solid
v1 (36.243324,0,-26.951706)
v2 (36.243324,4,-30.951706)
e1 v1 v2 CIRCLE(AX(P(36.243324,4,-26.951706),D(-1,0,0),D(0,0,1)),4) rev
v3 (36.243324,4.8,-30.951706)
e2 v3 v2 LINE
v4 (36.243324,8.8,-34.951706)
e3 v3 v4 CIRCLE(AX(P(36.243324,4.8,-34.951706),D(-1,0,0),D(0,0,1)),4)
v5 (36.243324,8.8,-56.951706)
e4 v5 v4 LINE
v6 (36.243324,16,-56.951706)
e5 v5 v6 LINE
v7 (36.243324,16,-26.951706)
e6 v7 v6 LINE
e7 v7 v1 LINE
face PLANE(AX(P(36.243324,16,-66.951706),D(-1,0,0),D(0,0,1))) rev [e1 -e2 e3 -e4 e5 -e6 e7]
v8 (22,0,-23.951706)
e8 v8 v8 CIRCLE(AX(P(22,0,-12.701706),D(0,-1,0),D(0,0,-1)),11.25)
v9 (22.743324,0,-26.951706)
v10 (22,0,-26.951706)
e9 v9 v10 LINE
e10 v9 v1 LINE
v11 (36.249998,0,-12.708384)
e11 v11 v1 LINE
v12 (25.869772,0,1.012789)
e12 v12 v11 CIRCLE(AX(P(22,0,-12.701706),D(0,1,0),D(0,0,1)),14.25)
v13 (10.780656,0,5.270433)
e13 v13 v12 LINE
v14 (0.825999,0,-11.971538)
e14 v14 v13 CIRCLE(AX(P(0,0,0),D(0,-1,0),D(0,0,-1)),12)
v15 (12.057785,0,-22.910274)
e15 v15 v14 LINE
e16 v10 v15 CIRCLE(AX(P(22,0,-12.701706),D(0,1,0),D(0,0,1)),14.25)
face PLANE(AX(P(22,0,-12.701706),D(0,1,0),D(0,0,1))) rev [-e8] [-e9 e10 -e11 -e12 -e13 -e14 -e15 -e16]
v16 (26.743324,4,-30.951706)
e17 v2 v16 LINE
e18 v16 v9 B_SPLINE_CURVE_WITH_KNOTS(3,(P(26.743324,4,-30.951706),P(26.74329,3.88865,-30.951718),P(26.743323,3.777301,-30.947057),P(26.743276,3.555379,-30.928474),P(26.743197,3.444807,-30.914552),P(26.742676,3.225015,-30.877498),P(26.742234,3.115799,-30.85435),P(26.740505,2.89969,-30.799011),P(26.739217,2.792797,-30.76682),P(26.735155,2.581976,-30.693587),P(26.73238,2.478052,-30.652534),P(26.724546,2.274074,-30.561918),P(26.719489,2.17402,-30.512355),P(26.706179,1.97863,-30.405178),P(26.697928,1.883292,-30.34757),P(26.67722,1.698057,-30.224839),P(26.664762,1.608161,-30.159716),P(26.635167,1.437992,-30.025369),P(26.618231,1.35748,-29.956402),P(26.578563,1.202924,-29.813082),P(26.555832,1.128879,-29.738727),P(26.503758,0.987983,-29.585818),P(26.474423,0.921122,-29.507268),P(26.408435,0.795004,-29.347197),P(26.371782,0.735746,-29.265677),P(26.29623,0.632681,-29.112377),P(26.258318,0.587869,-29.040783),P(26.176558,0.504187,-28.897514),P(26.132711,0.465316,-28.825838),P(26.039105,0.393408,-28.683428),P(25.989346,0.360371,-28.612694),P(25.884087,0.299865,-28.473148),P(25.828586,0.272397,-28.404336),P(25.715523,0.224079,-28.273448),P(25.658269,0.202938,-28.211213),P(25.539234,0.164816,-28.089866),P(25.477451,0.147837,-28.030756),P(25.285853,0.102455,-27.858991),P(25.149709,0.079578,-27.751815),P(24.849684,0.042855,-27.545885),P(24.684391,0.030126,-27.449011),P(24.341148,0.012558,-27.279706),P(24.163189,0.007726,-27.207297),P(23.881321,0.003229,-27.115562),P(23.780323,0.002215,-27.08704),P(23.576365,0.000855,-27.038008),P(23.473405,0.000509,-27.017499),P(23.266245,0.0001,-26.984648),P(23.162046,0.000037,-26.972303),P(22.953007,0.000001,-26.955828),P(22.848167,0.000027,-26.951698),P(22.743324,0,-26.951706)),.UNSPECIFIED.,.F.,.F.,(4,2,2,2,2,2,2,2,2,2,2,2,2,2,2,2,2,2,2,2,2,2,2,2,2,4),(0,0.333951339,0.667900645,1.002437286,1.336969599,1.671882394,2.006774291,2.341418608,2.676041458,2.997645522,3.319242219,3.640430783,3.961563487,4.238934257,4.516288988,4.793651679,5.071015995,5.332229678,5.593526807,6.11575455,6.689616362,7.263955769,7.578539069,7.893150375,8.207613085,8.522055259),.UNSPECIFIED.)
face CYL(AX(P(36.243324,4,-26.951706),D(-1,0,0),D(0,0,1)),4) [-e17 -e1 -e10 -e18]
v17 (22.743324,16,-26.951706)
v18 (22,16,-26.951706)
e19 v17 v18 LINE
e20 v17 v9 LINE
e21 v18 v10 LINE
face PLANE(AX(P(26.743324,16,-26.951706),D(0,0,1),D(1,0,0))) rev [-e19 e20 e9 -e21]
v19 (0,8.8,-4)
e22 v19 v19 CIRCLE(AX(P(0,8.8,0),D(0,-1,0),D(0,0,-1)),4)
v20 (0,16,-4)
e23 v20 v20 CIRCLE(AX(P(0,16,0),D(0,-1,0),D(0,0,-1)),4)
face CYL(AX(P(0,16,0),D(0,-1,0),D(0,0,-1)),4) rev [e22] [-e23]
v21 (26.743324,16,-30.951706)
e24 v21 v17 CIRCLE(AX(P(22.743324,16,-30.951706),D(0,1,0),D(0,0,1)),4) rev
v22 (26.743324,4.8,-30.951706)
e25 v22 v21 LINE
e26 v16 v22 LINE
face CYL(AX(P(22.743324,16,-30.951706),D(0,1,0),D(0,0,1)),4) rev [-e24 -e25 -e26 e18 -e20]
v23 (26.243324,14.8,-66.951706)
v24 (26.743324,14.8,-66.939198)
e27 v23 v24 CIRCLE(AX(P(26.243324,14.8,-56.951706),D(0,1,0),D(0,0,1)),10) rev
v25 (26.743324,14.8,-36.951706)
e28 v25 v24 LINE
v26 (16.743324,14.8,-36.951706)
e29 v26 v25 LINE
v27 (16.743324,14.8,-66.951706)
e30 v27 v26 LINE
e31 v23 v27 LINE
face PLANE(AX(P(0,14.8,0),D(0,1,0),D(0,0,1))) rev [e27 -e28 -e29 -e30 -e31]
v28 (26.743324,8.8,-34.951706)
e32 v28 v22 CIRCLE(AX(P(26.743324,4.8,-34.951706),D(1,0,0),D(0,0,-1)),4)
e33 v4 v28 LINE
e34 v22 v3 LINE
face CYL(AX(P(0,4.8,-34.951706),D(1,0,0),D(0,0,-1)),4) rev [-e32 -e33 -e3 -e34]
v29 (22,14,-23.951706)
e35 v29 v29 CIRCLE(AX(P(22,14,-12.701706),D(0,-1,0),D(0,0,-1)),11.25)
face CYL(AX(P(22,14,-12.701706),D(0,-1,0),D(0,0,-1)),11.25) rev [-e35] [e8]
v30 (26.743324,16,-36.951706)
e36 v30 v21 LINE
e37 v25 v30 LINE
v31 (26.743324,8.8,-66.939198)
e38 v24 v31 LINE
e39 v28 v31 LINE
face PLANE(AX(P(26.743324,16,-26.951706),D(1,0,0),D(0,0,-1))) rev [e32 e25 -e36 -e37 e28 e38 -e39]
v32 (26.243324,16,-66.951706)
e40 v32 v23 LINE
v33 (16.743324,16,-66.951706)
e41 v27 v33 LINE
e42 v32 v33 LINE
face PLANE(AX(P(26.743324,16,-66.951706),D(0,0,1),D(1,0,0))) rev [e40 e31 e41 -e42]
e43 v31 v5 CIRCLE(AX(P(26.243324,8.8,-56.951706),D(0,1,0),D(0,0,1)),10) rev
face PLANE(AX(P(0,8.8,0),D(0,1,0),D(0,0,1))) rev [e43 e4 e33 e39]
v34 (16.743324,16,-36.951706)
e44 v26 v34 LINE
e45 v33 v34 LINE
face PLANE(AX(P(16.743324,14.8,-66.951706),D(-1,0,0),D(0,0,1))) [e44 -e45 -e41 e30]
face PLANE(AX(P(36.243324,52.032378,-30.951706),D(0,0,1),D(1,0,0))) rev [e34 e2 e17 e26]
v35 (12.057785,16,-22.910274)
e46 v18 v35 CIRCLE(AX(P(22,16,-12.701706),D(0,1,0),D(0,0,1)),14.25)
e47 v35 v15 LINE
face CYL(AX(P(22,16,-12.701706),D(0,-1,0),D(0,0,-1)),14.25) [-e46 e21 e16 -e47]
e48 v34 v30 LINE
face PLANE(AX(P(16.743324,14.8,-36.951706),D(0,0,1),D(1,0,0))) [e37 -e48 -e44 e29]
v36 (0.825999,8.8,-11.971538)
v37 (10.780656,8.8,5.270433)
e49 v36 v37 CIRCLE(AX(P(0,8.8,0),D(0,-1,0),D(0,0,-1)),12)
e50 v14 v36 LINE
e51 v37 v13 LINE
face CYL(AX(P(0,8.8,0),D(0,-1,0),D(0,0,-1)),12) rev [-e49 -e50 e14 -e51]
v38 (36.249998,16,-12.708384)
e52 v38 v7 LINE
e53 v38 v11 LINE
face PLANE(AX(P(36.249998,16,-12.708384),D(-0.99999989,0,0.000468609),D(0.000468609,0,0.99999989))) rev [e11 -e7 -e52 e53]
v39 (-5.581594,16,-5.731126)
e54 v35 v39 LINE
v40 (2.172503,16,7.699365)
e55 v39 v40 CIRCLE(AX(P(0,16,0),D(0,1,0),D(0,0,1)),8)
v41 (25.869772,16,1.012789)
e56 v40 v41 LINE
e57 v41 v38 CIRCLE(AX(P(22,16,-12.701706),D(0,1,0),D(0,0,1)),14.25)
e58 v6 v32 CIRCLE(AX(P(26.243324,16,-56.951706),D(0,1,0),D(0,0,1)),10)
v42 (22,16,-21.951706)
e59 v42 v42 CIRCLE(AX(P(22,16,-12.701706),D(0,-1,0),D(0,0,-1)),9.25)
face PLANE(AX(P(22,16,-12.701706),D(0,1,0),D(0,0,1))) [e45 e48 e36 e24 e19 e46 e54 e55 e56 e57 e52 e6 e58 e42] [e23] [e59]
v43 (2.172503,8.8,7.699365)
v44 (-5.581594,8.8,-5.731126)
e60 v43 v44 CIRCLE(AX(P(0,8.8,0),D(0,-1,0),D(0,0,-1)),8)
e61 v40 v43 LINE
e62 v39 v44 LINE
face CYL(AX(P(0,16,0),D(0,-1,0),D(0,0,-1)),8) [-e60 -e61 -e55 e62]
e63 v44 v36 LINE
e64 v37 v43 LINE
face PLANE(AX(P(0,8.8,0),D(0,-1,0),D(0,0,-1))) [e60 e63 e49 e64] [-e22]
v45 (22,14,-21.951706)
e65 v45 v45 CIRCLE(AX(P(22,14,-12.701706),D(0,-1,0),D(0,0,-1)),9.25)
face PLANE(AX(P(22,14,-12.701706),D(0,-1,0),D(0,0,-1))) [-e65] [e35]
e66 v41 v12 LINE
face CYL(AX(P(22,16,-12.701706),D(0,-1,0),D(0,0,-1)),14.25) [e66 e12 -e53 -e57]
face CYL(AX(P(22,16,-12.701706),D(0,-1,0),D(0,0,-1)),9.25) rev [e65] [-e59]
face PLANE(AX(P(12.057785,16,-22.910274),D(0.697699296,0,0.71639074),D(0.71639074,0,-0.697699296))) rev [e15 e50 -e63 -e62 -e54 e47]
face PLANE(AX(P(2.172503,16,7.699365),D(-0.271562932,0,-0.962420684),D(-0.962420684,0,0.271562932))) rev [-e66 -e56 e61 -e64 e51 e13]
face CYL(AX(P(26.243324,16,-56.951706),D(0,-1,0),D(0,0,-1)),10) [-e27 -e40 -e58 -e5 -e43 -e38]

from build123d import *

# Parameters (mm, degrees)
BOSS_EXTRUDE1_DEPTH = 16
SKETCH13_R          = 11.25
CUT_EXTRUDE5_DEPTH  = 14
SKETCH14_R          = 12
CUT_EXTRUDE6_DEPTH  = 8.8
SKETCH15_R          = 9.25
CUT_EXTRUDE7_DEPTH  = 78.41184293
SKETCH17_R          = 4
CUT_EXTRUDE8_DEPTH  = 77.64224309
FILLET1_R           = 4
SKETCH18_W          = 10
SKETCH18_H          = 30
BOSS_EXTRUDE2_DEPTH = 1.2
SKETCH19_W          = 9.5
SKETCH19_H          = 36
CUT_EXTRUDE9_DEPTH  = 8.8
FILLET2_R           = 4
FILLET3_R           = 10


with BuildPart() as part:
    # Sketch2 → Boss-Extrude1 (new body)
    with BuildSketch(Plane(origin=(0, 0, 0), x_dir=(1, 0, 0), z_dir=(0, 1, 0))):
        with BuildLine():
            Line((26.74332389, 26.951705922), (22, 26.951705922))
            ThreePointArc((22, 26.951705922), (16.633883839, 25.902739872), (12.057785035, 22.91027397))
            Line((12.057785035, 22.91027397), (-5.581594366, 5.731125922))
            ThreePointArc((-5.581594366, 5.731125922), (-6.92820323, -4), (2.172503457, -7.699365476))
            Line((2.172503457, -7.699365476), (25.869771783, -1.012788831))
            ThreePointArc((25.869771783, -1.012788831), (33.364381258, 4.104419222), (36.249998435, 12.708383596))
            Line((36.249998435, 12.708383596), (36.24332389, 26.951705922))
            Line((36.24332389, 26.951705922), (36.24332389, 66.951705922))
            Line((36.24332389, 66.951705922), (26.74332389, 66.951705922))
            Line((26.74332389, 66.951705922), (26.74332389, 26.951705922))
        make_face()
    extrude(amount=BOSS_EXTRUDE1_DEPTH)

    # Sketch13 → Cut-Extrude5 (cut)
    with BuildSketch(Plane.XZ):
        with Locations(Location((22, -12.701705922, 0), (0, 0, 270))):
            Circle(SKETCH13_R)
    extrude(amount=-CUT_EXTRUDE5_DEPTH, mode=Mode.SUBTRACT)

    # Sketch14 → Cut-Extrude6 (cut)
    with BuildSketch(Plane.XZ):
        Circle(SKETCH14_R)
    extrude(amount=-CUT_EXTRUDE6_DEPTH, mode=Mode.SUBTRACT)

    # Sketch15 → Cut-Extrude7 (cut, through all)
    with BuildSketch(Plane.XZ.offset(-14)):
        with Locations(Location((22, -12.701705922, 0), (0, 0, 270))):
            Circle(SKETCH15_R)
    extrude(amount=-CUT_EXTRUDE7_DEPTH, mode=Mode.SUBTRACT)

    # Sketch17 → Cut-Extrude8 (cut, through all)
    with BuildSketch(Plane.XZ.offset(-8.8)):
        with Locations(Location((0, 0, 0), (0, 0, 270))):
            Circle(SKETCH17_R)
    extrude(amount=-CUT_EXTRUDE8_DEPTH, mode=Mode.SUBTRACT)

    # Fillet1
    fillet1_edges = [part.edges().sort_by_distance(p)[0] for p in [
        (26.74332389, 8, -26.951705922),
    ]]
    fillet(fillet1_edges, radius=FILLET1_R)

    # Sketch18 → Boss-Extrude2 (add)
    with BuildSketch(Plane(origin=(0, 16, 0), x_dir=(1, 0, 0), z_dir=(0, 1, 0))):
        with Locations((21.74332389, 51.951705922)):
            Rectangle(SKETCH18_W, SKETCH18_H)
    extrude(amount=-BOSS_EXTRUDE2_DEPTH)

    # Sketch19 → Cut-Extrude9 (cut)
    with BuildSketch(Plane.XZ):
        with Locations((31.49332389, -48.951705922)):
            Rectangle(SKETCH19_W, SKETCH19_H)
    extrude(amount=-CUT_EXTRUDE9_DEPTH, mode=Mode.SUBTRACT)

    # Fillet2
    fillet2_edges = [part.edges().sort_by_distance(p)[0] for p in [
        (31.49332389, 0, -30.951705922),
        (31.49332389, 8.8, -30.951705922),
    ]]
    fillet(fillet2_edges, radius=FILLET2_R - 0.0001)  # a hair under: the kernel refuses the full size

    # Fillet3
    fillet3_edges = [part.edges().sort_by_distance(p)[0] for p in [
        (36.24332389, 12.4, -66.951705922),
    ]]
    fillet(fillet3_edges, radius=FILLET3_R)


solid = part.part
